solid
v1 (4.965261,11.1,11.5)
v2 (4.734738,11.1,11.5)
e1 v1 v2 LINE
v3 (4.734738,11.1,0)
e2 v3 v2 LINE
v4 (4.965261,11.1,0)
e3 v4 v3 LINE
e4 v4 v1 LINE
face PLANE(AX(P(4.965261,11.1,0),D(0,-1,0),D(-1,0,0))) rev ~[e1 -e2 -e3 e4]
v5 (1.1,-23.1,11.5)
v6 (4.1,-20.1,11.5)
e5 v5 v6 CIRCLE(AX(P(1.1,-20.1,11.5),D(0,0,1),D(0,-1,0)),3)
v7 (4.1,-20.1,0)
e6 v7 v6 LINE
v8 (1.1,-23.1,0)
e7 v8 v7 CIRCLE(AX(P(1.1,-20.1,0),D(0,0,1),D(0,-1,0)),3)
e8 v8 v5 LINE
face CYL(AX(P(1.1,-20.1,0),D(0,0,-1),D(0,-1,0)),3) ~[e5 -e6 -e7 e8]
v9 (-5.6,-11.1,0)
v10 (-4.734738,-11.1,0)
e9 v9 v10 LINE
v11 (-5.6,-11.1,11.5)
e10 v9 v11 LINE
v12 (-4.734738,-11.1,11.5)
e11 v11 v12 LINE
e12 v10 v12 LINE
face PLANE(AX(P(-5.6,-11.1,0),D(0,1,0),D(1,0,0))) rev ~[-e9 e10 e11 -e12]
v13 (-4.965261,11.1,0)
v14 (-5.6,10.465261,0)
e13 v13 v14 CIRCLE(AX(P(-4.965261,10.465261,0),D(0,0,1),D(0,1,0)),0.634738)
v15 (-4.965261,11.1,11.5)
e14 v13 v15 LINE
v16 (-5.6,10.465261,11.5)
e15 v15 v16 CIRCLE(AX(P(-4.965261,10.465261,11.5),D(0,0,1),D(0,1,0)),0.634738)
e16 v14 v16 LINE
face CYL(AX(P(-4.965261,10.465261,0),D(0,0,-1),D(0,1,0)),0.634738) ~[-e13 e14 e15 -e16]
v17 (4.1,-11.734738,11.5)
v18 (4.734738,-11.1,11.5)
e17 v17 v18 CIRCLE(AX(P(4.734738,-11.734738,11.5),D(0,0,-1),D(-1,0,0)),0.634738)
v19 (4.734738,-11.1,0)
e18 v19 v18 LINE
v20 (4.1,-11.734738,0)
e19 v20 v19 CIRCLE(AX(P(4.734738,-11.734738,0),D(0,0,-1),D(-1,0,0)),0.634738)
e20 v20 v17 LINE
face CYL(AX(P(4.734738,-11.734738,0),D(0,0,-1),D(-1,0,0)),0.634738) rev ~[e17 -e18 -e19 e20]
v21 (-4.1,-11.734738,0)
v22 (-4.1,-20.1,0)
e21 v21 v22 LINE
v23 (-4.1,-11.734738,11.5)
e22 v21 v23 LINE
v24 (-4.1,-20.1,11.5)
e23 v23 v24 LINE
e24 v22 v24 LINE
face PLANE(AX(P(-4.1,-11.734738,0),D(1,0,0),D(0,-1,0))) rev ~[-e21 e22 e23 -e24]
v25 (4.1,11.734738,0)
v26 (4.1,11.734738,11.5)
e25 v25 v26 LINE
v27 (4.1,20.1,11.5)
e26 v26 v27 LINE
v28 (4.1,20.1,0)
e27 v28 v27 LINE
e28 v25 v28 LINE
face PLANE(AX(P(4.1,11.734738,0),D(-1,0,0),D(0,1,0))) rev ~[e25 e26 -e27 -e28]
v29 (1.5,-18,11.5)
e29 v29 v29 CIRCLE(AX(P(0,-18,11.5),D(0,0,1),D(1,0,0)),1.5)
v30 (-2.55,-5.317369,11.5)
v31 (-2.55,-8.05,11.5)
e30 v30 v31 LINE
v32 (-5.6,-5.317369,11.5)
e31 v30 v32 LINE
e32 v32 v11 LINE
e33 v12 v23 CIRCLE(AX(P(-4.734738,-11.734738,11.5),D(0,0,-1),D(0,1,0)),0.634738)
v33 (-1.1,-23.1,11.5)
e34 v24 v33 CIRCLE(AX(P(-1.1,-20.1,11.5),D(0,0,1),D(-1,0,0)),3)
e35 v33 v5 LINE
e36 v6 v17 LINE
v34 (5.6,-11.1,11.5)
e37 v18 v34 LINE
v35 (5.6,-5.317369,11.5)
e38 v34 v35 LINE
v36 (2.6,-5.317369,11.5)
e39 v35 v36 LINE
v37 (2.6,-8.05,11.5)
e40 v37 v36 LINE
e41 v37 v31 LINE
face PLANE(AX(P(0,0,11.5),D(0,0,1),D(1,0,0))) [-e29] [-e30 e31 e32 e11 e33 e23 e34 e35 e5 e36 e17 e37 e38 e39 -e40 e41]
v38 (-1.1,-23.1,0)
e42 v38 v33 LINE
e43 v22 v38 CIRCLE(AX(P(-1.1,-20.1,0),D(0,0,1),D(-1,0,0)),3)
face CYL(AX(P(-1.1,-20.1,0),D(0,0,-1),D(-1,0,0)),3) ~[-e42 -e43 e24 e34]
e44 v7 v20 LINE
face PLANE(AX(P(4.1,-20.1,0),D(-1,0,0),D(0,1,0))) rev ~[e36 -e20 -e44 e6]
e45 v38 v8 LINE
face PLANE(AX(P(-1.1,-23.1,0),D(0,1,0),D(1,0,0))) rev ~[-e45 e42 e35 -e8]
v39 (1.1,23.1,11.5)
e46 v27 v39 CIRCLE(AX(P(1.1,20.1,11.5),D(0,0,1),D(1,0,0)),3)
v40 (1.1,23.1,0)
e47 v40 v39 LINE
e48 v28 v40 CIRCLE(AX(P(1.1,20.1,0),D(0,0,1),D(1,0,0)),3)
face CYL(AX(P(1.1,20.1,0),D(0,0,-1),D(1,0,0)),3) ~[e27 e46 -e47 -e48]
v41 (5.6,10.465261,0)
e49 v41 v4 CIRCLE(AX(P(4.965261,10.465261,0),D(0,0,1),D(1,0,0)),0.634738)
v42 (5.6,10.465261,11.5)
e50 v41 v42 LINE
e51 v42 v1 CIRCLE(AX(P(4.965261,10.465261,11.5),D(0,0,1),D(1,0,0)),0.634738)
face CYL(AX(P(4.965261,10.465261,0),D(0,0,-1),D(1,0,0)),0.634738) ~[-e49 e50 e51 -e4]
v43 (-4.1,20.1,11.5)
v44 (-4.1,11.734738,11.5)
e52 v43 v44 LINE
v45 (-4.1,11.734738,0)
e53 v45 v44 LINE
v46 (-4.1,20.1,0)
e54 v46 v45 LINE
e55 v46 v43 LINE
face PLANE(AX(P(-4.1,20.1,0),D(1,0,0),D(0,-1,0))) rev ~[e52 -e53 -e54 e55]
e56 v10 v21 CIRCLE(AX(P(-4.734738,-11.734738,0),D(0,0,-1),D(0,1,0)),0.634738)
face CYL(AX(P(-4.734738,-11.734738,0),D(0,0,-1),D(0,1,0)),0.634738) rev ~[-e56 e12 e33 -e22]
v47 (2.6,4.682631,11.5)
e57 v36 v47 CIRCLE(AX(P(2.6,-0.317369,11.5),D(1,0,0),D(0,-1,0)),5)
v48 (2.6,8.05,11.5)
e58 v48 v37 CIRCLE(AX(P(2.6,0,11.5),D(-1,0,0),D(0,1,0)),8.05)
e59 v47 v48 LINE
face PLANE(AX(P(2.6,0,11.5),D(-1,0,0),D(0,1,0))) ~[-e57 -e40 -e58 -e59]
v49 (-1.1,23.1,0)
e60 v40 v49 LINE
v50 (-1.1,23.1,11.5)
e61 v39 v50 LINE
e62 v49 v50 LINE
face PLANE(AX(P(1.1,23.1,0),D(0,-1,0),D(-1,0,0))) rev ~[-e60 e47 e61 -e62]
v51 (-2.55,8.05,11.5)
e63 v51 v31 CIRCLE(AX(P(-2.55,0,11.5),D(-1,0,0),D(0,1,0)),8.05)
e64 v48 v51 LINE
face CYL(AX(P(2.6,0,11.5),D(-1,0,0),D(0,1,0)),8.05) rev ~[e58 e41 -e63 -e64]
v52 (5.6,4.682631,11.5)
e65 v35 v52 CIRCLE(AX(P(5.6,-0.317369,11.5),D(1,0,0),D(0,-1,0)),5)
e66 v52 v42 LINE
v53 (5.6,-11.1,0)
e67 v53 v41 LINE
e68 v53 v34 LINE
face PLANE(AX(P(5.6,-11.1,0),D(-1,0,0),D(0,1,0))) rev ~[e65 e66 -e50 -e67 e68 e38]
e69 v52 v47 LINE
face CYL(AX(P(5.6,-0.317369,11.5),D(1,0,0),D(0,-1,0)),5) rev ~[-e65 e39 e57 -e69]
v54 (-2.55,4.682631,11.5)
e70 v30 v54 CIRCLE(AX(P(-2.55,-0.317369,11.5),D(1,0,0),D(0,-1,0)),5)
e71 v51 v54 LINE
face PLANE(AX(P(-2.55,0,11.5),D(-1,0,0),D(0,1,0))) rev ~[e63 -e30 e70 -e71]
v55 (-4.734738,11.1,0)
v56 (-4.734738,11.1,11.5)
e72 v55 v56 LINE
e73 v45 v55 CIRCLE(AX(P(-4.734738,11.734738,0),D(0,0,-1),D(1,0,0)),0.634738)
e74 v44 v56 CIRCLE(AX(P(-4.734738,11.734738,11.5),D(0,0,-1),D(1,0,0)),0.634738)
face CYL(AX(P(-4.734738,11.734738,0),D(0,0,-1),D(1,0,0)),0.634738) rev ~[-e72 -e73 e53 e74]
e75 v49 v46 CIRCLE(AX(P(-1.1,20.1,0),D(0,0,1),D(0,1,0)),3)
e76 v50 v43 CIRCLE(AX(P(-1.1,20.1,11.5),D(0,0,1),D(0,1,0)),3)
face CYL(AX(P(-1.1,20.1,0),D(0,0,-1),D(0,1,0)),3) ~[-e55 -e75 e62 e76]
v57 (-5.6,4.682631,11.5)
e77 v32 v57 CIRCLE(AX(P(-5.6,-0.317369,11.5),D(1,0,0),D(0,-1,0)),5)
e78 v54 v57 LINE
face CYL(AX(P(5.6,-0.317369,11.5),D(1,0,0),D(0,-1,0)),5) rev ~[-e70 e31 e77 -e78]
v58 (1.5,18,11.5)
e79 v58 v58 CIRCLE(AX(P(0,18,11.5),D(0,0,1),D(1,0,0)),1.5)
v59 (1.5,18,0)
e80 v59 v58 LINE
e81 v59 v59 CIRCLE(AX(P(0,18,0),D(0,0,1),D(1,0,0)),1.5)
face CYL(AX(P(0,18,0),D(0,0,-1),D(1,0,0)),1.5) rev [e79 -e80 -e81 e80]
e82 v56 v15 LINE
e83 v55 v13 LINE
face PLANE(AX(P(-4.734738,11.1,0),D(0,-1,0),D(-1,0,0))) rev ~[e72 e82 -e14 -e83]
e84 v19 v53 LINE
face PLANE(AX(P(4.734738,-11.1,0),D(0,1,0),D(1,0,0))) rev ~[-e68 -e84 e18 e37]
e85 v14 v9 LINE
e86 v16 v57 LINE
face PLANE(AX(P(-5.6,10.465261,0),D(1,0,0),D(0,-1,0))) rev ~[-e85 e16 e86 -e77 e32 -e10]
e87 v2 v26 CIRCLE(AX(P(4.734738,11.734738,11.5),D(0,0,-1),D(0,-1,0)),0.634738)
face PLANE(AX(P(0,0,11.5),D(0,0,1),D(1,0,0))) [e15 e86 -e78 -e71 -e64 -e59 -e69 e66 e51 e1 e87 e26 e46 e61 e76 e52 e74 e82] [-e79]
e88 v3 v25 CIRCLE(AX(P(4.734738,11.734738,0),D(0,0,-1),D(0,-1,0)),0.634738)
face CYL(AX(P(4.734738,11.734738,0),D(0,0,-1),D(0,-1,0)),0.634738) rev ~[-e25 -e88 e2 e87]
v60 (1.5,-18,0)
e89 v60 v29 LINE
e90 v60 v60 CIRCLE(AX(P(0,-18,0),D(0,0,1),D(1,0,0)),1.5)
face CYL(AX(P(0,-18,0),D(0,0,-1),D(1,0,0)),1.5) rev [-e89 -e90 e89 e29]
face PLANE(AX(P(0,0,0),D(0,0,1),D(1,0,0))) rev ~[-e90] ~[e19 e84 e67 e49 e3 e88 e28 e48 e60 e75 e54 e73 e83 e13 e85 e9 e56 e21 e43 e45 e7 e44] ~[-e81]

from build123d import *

# Parameters (mm, degrees)
F0_R     = 1.5
F0_W     = 5.1
F0_H     = 16.1
F1_DEPTH = 11.5
F3_DEPTH = 25


# Not quite as in the source:
# - a feature names something its author has since deleted; it is built from what else it names


with BuildPart() as f1:
    # F0 (on Top) → F1 (new body)
    with BuildSketch(Plane.XY):
        with BuildLine():
            ThreePointArc((5.5999997705, 10.465261464), (5.4140892248, 10.9140892248), (4.965261464, 11.0999997705))
            Line((4.965261464, 11.0999997705), (4.734738077, 11.0999997705))
            Line((4.734738077, 11.0999997705), (-4.734738077, 11.0999997705))
            Line((-4.734738077, 11.0999997705), (-4.965261464, 11.0999997705))
            ThreePointArc((-4.965261464, 11.0999997705), (-5.4140892248, 10.9140892248), (-5.5999997705, 10.465261464))
            Line((-5.5999997705, 10.465261464), (-5.5999997705, -10.465261464))
            ThreePointArc((-5.5999997705, -10.465261464), (-5.4140892248, -10.9140892248), (-4.965261464, -11.0999997705))
            Line((-4.965261464, -11.0999997705), (-4.734738077, -11.0999997705))
            Line((-4.734738077, -11.0999997705), (4.734738077, -11.0999997705))
            Line((4.734738077, -11.0999997705), (4.965261464, -11.0999997705))
            ThreePointArc((4.965261464, -11.0999997705), (5.4140892248, -10.9140892248), (5.5999997705, -10.465261464))
            Line((5.5999997705, -10.465261464), (5.5999997705, 10.465261464))
        make_face()
        Polygon((2.6, 8.1), (2.6, 0), (2.6, -8.1), (-2.6, -8.1), (-2.6, 8.1), align=None, mode=Mode.SUBTRACT)
        with BuildLine():
            Line((-4.734738077, 11.0999997705), (4.734738077, 11.0999997705))
            ThreePointArc((4.734738077, 11.0999997705), (4.2859103162, 11.2859103162), (4.0999997705, 11.734738077))
            Line((4.0999997705, 11.734738077), (4.0999997705, 20.0999997705))
            ThreePointArc((4.0999997705, 20.0999997705), (3.2213201141, 22.2213201141), (1.0999997705, 23.0999997705))
            Line((1.0999997705, 23.0999997705), (-1.0999997705, 23.0999997705))
            ThreePointArc((-1.0999997705, 23.0999997705), (-3.2213201141, 22.2213201141), (-4.0999997705, 20.0999997705))
            Line((-4.0999997705, 20.0999997705), (-4.0999997705, 11.734738077))
            ThreePointArc((-4.0999997705, 11.734738077), (-4.2859103162, 11.2859103162), (-4.734738077, 11.0999997705))
        make_face()
        with Locations((0, 18)):
            Circle(F0_R, mode=Mode.SUBTRACT)
        with BuildLine():
            ThreePointArc((4.0999997705, -11.734738077), (4.2859103162, -11.2859103162), (4.734738077, -11.0999997705))
            Line((4.734738077, -11.0999997705), (-4.734738077, -11.0999997705))
            ThreePointArc((-4.734738077, -11.0999997705), (-4.2859103162, -11.2859103162), (-4.0999997705, -11.734738077))
            Line((-4.0999997705, -11.734738077), (-4.0999997705, -20.0999997705))
            ThreePointArc((-4.0999997705, -20.0999997705), (-3.2213201141, -22.2213201141), (-1.0999997705, -23.0999997705))
            Line((-1.0999997705, -23.0999997705), (1.0999997705, -23.0999997705))
            ThreePointArc((1.0999997705, -23.0999997705), (3.2213201141, -22.2213201141), (4.0999997705, -20.0999997705))
            Line((4.0999997705, -20.0999997705), (4.0999997705, -11.734738077))
        make_face()
        with Locations((0, -18)):
            Circle(F0_R, mode=Mode.SUBTRACT)
        Polygon((2.6, -8.1), (2.6, 0), (2.6, 8.1), (-2.6, 8.1), (-2.6, -8.1), align=None)
        Rectangle(F0_W, F0_H, mode=Mode.SUBTRACT)
        Rectangle(F0_W, F0_H)
        with BuildLine():
            Line((5.5999997705, -11.0999997705), (5.5999997705, -10.465261464))
            ThreePointArc((5.5999997705, -10.465261464), (5.4140892248, -10.9140892248), (4.965261464, -11.0999997705))
            Line((4.965261464, -11.0999997705), (5.5999997705, -11.0999997705))
        make_face()
        with BuildLine():
            ThreePointArc((-4.965261464, -11.0999997705), (-5.4140892248, -10.9140892248), (-5.5999997705, -10.465261464))
            Line((-5.5999997705, -10.465261464), (-5.5999997705, -11.0999997705))
            Line((-5.5999997705, -11.0999997705), (-4.965261464, -11.0999997705))
        make_face()
    extrude(amount=F1_DEPTH)

    # F2 (on face) → F3 (cut)
    with BuildSketch(Plane.YZ.offset(5.5999997705)):
        with BuildLine():
            ThreePointArc((-5.3173691533, 11.5), (-0.3173691533, 6.5), (4.6826308467, 11.5))
            Line((4.6826308467, 11.5), (-5.3173691533, 11.5))
        make_face()
    extrude(amount=-F3_DEPTH, mode=Mode.SUBTRACT)

    # F4 (on face) → F5 (revolve, cut)
    with BuildSketch(Plane.XY.offset(11.5)):
        Polygon((2.55, 8.05), (-2.55, 8.05), (-2.55, 4.6826308467), (2.6, 4.6826308467), (2.6, 8.05), align=None)
        Polygon((2.6, 4.6826308467), (-2.55, 4.6826308467), (-2.55, 0), (0, 0), (2.6, 0), align=None)
    revolve(axis=Axis((0.025, 0, 11.5), (-1, 0, 0)), mode=Mode.SUBTRACT)


solid = f1.part
